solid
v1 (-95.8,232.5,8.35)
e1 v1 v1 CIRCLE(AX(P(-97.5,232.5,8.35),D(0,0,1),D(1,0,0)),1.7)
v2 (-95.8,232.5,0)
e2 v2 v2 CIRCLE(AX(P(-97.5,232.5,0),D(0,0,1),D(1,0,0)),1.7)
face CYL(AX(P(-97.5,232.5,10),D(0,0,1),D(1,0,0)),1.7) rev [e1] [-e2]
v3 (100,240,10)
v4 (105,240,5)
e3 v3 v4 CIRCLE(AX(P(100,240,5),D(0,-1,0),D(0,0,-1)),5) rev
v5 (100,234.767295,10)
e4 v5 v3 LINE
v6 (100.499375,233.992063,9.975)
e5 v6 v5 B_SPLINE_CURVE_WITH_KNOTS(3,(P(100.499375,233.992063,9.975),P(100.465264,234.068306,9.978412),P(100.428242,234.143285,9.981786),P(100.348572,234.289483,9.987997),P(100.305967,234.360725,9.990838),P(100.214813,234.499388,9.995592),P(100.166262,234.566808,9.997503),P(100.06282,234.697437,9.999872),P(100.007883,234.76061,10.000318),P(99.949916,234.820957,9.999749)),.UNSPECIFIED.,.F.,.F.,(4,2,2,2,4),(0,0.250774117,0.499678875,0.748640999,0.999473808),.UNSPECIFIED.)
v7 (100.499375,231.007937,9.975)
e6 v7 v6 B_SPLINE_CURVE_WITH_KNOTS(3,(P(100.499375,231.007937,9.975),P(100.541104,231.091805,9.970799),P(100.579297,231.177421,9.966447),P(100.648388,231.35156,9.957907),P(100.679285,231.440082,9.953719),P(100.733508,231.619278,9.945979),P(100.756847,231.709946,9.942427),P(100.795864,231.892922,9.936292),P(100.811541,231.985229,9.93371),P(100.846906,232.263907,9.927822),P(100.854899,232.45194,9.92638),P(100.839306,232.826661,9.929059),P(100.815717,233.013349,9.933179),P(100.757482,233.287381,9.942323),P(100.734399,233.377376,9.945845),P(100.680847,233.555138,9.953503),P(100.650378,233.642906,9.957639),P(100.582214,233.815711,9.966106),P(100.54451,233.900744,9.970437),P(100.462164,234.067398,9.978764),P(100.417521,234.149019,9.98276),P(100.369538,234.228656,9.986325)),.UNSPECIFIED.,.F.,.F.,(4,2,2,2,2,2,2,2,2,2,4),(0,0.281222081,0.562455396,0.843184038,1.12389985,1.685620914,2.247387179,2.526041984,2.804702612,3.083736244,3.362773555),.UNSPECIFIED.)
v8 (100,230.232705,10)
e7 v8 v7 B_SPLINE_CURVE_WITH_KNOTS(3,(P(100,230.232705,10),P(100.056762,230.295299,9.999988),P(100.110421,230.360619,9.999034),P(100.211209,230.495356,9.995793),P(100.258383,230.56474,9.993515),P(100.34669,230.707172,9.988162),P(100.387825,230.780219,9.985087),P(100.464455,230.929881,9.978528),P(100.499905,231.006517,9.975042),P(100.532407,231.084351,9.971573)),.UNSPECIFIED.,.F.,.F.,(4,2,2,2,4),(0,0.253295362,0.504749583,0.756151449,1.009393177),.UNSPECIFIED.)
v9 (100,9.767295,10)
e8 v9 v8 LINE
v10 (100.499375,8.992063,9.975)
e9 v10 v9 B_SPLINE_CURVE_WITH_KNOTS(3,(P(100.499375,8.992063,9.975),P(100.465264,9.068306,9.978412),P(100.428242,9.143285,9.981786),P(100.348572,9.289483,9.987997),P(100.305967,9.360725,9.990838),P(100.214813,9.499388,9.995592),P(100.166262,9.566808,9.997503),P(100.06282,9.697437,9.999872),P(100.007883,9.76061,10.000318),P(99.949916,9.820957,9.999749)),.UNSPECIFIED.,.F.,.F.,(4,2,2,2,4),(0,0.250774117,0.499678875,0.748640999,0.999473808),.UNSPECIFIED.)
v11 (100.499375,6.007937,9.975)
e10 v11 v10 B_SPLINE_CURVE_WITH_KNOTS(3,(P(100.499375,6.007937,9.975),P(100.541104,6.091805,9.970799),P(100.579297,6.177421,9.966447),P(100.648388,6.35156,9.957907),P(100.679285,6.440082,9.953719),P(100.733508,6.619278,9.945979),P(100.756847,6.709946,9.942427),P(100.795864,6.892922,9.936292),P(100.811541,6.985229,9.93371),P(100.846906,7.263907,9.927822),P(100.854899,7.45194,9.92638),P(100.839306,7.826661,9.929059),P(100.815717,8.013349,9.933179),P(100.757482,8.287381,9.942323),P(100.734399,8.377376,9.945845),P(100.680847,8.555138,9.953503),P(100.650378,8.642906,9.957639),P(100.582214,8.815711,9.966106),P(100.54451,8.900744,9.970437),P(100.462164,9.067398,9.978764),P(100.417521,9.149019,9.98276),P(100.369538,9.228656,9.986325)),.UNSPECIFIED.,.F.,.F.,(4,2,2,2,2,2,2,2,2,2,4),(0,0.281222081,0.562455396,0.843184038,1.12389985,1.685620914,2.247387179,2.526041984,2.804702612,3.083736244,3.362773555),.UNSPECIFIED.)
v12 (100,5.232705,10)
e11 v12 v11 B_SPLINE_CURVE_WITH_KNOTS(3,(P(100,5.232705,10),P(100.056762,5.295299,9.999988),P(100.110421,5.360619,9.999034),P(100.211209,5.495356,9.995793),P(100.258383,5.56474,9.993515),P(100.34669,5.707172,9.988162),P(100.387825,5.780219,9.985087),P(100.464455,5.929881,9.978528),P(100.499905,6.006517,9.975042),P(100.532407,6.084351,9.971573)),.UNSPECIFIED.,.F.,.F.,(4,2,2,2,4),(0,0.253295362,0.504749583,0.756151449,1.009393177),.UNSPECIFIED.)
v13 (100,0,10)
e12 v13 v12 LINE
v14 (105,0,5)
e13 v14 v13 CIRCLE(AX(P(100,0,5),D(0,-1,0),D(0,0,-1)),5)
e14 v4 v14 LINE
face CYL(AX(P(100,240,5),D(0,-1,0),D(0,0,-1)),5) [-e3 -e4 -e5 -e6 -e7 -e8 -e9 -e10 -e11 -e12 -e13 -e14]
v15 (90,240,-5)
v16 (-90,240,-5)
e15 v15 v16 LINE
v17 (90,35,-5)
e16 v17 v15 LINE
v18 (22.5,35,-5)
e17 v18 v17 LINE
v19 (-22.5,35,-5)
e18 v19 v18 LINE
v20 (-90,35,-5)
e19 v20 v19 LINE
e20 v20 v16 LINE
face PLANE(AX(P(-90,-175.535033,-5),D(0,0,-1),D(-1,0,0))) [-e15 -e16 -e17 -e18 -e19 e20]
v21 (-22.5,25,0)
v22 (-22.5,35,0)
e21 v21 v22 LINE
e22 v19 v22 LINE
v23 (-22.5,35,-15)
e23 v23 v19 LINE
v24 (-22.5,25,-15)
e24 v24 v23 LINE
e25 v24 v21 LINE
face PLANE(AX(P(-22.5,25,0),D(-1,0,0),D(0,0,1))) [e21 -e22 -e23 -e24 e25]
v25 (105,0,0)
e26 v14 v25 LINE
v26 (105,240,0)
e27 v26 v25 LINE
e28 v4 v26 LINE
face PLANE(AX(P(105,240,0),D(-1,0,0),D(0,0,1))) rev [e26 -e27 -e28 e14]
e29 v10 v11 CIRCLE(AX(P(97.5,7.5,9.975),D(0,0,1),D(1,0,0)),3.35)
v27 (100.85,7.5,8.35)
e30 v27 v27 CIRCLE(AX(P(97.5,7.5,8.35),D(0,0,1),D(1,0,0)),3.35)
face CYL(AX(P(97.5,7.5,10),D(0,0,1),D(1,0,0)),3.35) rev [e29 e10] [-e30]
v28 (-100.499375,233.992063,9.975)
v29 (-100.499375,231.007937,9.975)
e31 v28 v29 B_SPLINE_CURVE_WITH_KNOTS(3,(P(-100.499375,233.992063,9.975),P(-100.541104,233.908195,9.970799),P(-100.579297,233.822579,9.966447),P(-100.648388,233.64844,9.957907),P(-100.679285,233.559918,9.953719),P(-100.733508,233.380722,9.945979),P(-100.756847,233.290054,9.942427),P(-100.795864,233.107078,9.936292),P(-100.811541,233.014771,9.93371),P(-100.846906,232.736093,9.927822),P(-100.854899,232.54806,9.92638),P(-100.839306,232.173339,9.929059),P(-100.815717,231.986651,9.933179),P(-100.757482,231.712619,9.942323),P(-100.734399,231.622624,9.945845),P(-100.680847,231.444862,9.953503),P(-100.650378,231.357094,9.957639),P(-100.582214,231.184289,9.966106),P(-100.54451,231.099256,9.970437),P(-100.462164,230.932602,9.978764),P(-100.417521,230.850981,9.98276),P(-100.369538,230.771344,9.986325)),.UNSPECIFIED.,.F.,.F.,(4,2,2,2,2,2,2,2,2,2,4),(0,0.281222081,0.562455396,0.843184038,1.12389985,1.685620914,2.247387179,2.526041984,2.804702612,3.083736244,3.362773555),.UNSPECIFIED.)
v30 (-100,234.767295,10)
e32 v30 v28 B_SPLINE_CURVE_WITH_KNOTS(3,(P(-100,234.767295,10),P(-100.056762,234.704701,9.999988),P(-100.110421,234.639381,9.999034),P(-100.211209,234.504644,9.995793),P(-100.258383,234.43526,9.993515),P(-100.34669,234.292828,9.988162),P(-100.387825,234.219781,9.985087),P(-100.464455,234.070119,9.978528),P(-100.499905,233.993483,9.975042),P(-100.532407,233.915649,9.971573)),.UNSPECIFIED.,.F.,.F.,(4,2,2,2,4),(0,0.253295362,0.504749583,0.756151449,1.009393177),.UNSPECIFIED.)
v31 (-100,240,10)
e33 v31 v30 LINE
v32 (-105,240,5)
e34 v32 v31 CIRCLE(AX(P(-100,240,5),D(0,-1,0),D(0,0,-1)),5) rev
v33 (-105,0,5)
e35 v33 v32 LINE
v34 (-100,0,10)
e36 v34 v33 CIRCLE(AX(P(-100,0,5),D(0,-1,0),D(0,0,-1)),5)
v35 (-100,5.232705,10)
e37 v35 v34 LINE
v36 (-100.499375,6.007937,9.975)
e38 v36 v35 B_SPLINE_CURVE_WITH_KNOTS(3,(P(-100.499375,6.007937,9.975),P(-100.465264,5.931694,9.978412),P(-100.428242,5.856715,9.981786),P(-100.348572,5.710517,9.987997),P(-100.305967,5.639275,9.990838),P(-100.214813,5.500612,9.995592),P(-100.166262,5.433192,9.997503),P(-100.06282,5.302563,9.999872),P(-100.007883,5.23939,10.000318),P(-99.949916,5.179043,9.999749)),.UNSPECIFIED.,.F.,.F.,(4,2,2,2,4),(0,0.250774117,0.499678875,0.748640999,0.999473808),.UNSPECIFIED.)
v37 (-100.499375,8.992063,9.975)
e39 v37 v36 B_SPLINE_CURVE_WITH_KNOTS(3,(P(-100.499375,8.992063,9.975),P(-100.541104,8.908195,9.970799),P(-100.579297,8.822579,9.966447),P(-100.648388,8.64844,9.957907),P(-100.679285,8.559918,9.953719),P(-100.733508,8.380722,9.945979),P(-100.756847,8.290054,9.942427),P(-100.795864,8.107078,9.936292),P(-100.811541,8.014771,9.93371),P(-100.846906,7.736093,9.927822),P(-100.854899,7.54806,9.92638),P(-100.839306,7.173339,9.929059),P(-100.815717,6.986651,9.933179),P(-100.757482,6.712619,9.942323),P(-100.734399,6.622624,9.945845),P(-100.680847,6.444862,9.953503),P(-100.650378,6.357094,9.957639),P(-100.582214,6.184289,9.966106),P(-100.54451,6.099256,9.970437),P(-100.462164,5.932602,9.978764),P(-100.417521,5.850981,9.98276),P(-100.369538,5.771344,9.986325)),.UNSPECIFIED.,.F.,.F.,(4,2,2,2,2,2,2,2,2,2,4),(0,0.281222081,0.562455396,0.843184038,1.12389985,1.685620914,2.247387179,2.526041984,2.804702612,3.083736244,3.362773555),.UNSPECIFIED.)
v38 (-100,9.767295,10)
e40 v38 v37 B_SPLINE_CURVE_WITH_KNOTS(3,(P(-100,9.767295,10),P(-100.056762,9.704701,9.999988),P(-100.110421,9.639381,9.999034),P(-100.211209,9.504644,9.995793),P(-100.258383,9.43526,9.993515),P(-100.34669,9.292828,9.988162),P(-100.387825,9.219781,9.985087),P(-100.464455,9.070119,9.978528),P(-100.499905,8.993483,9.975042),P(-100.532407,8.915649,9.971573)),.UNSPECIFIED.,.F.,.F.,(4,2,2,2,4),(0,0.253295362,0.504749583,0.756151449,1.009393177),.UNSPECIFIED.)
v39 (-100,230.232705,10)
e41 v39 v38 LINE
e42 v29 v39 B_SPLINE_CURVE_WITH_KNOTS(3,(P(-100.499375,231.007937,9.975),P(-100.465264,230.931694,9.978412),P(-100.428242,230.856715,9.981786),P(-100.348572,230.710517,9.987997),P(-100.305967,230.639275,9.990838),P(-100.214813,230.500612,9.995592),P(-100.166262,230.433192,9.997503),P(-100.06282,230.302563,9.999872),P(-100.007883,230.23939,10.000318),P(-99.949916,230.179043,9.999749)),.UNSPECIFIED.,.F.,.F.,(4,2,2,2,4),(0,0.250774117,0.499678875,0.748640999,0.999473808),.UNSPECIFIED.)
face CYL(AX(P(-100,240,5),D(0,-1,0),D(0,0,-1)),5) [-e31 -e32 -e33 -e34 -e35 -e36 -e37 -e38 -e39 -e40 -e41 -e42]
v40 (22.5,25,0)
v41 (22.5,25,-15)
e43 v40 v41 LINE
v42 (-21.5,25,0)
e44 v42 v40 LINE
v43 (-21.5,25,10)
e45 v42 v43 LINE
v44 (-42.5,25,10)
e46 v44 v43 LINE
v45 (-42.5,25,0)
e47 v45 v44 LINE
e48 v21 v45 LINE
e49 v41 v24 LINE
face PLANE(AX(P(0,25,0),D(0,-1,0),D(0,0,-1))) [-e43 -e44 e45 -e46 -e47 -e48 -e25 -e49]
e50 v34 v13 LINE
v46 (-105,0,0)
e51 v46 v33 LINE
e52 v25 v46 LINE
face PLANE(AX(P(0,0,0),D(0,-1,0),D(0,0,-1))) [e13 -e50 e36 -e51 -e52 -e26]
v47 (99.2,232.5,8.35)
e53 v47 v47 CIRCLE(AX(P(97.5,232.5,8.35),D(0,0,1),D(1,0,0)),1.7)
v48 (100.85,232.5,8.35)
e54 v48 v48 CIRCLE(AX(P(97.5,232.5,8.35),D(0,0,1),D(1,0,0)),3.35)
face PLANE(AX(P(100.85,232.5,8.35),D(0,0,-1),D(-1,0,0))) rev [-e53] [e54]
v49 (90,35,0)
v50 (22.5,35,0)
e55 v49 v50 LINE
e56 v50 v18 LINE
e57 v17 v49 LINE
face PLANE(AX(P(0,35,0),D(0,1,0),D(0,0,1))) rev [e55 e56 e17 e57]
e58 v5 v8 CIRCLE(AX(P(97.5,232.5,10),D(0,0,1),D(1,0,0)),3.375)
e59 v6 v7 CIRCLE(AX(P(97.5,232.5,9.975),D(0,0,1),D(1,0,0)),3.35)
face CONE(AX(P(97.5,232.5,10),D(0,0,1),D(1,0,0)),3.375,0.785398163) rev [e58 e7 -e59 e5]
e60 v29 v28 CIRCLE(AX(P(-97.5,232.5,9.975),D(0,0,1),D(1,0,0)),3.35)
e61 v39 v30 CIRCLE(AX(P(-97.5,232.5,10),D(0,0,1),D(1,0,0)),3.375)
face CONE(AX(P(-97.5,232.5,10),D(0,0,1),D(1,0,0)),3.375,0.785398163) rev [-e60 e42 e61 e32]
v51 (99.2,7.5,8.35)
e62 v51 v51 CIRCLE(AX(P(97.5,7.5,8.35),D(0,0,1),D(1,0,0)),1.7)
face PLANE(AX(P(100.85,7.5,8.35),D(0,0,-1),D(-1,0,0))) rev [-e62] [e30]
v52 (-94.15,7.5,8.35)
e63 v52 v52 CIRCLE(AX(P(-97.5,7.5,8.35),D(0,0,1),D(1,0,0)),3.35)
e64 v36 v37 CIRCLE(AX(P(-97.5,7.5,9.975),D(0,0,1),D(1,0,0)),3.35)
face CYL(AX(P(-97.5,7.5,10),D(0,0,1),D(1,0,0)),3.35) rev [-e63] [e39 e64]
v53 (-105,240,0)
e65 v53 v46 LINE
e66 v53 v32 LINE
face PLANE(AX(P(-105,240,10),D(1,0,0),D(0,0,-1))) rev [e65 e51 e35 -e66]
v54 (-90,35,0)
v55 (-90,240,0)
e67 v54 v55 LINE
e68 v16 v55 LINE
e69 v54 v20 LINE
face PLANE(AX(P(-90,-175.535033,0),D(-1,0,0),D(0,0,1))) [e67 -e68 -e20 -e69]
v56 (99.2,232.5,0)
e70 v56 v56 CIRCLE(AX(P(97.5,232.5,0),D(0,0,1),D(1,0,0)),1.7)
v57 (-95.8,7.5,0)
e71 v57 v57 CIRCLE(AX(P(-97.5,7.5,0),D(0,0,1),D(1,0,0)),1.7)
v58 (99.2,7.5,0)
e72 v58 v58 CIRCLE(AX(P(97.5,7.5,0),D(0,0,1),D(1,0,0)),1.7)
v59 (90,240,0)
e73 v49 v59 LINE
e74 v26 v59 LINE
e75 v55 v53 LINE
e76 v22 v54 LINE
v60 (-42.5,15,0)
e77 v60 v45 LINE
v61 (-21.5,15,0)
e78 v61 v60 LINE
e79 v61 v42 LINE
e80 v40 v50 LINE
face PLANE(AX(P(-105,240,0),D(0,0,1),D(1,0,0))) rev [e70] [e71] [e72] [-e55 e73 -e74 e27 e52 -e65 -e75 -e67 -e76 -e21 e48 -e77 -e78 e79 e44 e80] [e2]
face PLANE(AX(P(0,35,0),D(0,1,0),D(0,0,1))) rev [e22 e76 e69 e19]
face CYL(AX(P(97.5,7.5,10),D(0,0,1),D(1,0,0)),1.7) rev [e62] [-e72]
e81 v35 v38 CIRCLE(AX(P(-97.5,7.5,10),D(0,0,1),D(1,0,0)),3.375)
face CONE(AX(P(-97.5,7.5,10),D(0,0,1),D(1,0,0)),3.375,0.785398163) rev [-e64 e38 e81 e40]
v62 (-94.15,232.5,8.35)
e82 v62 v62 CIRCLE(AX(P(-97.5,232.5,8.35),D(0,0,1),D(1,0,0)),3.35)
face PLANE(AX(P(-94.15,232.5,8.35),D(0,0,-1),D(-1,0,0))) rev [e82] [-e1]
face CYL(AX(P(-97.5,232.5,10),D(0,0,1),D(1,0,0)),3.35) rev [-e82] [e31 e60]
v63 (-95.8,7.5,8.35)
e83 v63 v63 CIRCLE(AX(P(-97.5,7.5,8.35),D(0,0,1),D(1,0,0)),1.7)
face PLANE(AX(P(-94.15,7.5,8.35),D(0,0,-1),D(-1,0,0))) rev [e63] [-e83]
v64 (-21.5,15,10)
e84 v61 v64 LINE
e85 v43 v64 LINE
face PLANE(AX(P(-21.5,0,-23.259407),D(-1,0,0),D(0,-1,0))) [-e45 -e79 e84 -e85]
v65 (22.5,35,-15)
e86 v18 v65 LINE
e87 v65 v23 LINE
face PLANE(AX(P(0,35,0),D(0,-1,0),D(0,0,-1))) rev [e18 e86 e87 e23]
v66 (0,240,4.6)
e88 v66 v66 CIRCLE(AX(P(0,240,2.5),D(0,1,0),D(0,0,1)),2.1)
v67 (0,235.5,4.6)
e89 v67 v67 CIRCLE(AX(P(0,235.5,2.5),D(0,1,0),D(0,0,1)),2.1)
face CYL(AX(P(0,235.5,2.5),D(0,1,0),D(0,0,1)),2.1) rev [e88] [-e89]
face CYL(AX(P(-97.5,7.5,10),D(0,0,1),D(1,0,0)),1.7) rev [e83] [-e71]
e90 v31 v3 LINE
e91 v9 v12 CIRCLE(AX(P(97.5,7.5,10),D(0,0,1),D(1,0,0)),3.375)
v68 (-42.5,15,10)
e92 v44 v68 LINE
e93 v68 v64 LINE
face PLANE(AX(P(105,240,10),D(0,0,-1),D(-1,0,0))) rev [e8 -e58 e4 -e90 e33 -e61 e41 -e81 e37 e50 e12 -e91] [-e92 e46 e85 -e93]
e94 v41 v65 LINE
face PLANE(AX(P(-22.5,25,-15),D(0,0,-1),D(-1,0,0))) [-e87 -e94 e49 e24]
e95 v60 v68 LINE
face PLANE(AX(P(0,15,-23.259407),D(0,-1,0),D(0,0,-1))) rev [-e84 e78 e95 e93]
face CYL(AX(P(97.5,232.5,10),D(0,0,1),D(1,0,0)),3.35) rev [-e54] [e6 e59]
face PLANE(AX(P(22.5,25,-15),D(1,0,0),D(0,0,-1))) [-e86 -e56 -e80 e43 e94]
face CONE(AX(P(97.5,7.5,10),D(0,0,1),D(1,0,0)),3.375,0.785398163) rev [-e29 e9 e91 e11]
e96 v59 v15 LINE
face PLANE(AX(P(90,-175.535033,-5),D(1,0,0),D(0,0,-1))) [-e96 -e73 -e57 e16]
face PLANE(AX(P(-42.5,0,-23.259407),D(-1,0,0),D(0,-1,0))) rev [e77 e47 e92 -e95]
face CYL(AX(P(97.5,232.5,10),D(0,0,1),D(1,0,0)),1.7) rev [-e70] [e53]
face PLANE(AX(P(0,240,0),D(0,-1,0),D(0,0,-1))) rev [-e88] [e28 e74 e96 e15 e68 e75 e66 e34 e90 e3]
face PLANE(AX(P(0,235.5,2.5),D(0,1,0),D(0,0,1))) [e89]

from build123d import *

# Parameters (mm, degrees)
SKETCH3_W           = 210
SKETCH3_H           = 10
BOSS_EXTRUDE1_DEPTH = 240
BOSS_EXTRUDE2_DEPTH = 205
SKETCH6_W           = 45
SKETCH6_H           = 15
BOSS_EXTRUDE3_DEPTH = 10
SKETCH7_R           = 1.65
CUT_EXTRUDE1_DEPTH  = 10
SKETCH8_W           = 21
SKETCH8_H           = 10
CUT_EXTRUDE2_DEPTH  = 10
SKETCH10_R          = 2.1
CUT_EXTRUDE3_DEPTH  = 4.5
FILLET2_R           = 5


with BuildPart() as part:
    # Sketch3 → Boss-Extrude1 (new body)
    with BuildSketch(Plane(origin=(0, 0, 0), x_dir=(1, 0, 0), z_dir=(0, 1, 0))):
        with Locations((0, -5)):
            Rectangle(SKETCH3_W, SKETCH3_H)
    extrude(amount=BOSS_EXTRUDE1_DEPTH)

    # Sketch5 → Boss-Extrude2 (add)
    with BuildSketch(Plane(origin=(0, 240, 0), x_dir=(1, 0, 0), z_dir=(0, 1, 0))):
        Polygon((-90, 0), (-90, 5), (90, 5), (90, 0), (105, 0), (105, -10), (-105, -10), (-105, 0), align=None)
    extrude(amount=-BOSS_EXTRUDE2_DEPTH)

    # Sketch6 → Boss-Extrude3 (add)
    with BuildSketch(Plane(origin=(0, 35, 0), x_dir=(1, 0, 0), z_dir=(0, 1, 0))):
        with Locations((0, 7.5)):
            Rectangle(SKETCH6_W, SKETCH6_H)
    extrude(amount=-BOSS_EXTRUDE3_DEPTH)

    # Sketch7 → Cut-Extrude1 (cut)
    with BuildSketch(Plane.XY.offset(10)):
        with Locations((-97.5, 232.5)):
            Circle(SKETCH7_R)
        with Locations((-97.5, 7.5)):
            Circle(SKETCH7_R)
        with Locations((97.5, 7.5)):
            Circle(SKETCH7_R)
        with Locations((97.5, 232.5)):
            Circle(SKETCH7_R)
    extrude(amount=-CUT_EXTRUDE1_DEPTH, mode=Mode.SUBTRACT)

    # Sketch8 → Cut-Extrude2 (cut)
    with BuildSketch(Plane.XY.offset(10)):
        with Locations((-32, 20)):
            Rectangle(SKETCH8_W, SKETCH8_H)
    extrude(amount=-CUT_EXTRUDE2_DEPTH, mode=Mode.SUBTRACT)

    # Sketch10 → Cut-Extrude3 (cut)
    with BuildSketch(Plane(origin=(0, 240, 0), x_dir=(1, 0, 0), z_dir=(0, 1, 0))):
        with Locations(Location((0, -2.5, 0), (0, 0, 270))):
            Circle(SKETCH10_R)
    extrude(amount=-CUT_EXTRUDE3_DEPTH, mode=Mode.SUBTRACT)

    # Sketch11 → CBORE for M3 SBHCS1 (revolve, cut)
    with BuildSketch(Plane(origin=(-97.5, 232.5, 10), x_dir=(0, -1, 0), z_dir=(1, 0, 0))):
        Polygon((0, 0), (0, 25), (1.7, 25), (1.7, 1.65), (3.35, 1.65), (3.35, 0.025), (3.375, 0), align=None)
    revolve(axis=Axis((-97.5, 232.5, 16.35), (0, 0, -1)), mode=Mode.SUBTRACT)

    # Sketch12 → CBORE for M3 SBHCS2 (revolve, cut)
    with BuildSketch(Plane(origin=(97.5, 232.5, 10), x_dir=(0, -1, 0), z_dir=(1, 0, 0))):
        Polygon((0, 0), (0, 25), (1.7, 25), (1.7, 1.65), (3.35, 1.65), (3.35, 0.025), (3.375, 0), align=None)
    revolve(axis=Axis((97.5, 232.5, 16.35), (0, 0, -1)), mode=Mode.SUBTRACT)

    # Sketch14 → CBORE for M3 SBHCS4 (revolve, cut)
    with BuildSketch(Plane(origin=(97.5, 7.5, 10), x_dir=(0, -1, 0), z_dir=(1, 0, 0))):
        Polygon((0, 0), (0, 25), (1.7, 25), (1.7, 1.65), (3.35, 1.65), (3.35, 0.025), (3.375, 0), align=None)
    revolve(axis=Axis((97.5, 7.5, 16.35), (0, 0, -1)), mode=Mode.SUBTRACT)

    # Sketch18 → CBORE for M3 SBHCS5 (revolve, cut)
    with BuildSketch(Plane(origin=(-97.5, 7.5, 10), x_dir=(0, -1, 0), z_dir=(1, 0, 0))):
        Polygon((0, 0), (0, 25), (1.7, 25), (1.7, 1.65), (3.35, 1.65), (3.35, 0.025), (3.375, 0), align=None)
    revolve(axis=Axis((-97.5, 7.5, 16.35), (0, 0, -1)), mode=Mode.SUBTRACT)

    # Fillet2
    # the kernel refuses this fillet: 5 mm, written as the material it takes off along each edge
    with BuildSketch(Plane(origin=(105, 252.5, 10), x_dir=(0, 0, -1), z_dir=(0, -1, 0)), Plane(origin=(-105, -12.5, 10), x_dir=(0, 0, -1), z_dir=(0, 1, 0))) as fillet2_piece_1:
        with BuildLine():
            CenterArc((FILLET2_R, -FILLET2_R), FILLET2_R, 90, 90)
            Line((0, -FILLET2_R), (0, 0))
            Line((0, 0), (FILLET2_R, 0))
        make_face()
    extrude(amount=265, mode=Mode.SUBTRACT)


solid = part.part
